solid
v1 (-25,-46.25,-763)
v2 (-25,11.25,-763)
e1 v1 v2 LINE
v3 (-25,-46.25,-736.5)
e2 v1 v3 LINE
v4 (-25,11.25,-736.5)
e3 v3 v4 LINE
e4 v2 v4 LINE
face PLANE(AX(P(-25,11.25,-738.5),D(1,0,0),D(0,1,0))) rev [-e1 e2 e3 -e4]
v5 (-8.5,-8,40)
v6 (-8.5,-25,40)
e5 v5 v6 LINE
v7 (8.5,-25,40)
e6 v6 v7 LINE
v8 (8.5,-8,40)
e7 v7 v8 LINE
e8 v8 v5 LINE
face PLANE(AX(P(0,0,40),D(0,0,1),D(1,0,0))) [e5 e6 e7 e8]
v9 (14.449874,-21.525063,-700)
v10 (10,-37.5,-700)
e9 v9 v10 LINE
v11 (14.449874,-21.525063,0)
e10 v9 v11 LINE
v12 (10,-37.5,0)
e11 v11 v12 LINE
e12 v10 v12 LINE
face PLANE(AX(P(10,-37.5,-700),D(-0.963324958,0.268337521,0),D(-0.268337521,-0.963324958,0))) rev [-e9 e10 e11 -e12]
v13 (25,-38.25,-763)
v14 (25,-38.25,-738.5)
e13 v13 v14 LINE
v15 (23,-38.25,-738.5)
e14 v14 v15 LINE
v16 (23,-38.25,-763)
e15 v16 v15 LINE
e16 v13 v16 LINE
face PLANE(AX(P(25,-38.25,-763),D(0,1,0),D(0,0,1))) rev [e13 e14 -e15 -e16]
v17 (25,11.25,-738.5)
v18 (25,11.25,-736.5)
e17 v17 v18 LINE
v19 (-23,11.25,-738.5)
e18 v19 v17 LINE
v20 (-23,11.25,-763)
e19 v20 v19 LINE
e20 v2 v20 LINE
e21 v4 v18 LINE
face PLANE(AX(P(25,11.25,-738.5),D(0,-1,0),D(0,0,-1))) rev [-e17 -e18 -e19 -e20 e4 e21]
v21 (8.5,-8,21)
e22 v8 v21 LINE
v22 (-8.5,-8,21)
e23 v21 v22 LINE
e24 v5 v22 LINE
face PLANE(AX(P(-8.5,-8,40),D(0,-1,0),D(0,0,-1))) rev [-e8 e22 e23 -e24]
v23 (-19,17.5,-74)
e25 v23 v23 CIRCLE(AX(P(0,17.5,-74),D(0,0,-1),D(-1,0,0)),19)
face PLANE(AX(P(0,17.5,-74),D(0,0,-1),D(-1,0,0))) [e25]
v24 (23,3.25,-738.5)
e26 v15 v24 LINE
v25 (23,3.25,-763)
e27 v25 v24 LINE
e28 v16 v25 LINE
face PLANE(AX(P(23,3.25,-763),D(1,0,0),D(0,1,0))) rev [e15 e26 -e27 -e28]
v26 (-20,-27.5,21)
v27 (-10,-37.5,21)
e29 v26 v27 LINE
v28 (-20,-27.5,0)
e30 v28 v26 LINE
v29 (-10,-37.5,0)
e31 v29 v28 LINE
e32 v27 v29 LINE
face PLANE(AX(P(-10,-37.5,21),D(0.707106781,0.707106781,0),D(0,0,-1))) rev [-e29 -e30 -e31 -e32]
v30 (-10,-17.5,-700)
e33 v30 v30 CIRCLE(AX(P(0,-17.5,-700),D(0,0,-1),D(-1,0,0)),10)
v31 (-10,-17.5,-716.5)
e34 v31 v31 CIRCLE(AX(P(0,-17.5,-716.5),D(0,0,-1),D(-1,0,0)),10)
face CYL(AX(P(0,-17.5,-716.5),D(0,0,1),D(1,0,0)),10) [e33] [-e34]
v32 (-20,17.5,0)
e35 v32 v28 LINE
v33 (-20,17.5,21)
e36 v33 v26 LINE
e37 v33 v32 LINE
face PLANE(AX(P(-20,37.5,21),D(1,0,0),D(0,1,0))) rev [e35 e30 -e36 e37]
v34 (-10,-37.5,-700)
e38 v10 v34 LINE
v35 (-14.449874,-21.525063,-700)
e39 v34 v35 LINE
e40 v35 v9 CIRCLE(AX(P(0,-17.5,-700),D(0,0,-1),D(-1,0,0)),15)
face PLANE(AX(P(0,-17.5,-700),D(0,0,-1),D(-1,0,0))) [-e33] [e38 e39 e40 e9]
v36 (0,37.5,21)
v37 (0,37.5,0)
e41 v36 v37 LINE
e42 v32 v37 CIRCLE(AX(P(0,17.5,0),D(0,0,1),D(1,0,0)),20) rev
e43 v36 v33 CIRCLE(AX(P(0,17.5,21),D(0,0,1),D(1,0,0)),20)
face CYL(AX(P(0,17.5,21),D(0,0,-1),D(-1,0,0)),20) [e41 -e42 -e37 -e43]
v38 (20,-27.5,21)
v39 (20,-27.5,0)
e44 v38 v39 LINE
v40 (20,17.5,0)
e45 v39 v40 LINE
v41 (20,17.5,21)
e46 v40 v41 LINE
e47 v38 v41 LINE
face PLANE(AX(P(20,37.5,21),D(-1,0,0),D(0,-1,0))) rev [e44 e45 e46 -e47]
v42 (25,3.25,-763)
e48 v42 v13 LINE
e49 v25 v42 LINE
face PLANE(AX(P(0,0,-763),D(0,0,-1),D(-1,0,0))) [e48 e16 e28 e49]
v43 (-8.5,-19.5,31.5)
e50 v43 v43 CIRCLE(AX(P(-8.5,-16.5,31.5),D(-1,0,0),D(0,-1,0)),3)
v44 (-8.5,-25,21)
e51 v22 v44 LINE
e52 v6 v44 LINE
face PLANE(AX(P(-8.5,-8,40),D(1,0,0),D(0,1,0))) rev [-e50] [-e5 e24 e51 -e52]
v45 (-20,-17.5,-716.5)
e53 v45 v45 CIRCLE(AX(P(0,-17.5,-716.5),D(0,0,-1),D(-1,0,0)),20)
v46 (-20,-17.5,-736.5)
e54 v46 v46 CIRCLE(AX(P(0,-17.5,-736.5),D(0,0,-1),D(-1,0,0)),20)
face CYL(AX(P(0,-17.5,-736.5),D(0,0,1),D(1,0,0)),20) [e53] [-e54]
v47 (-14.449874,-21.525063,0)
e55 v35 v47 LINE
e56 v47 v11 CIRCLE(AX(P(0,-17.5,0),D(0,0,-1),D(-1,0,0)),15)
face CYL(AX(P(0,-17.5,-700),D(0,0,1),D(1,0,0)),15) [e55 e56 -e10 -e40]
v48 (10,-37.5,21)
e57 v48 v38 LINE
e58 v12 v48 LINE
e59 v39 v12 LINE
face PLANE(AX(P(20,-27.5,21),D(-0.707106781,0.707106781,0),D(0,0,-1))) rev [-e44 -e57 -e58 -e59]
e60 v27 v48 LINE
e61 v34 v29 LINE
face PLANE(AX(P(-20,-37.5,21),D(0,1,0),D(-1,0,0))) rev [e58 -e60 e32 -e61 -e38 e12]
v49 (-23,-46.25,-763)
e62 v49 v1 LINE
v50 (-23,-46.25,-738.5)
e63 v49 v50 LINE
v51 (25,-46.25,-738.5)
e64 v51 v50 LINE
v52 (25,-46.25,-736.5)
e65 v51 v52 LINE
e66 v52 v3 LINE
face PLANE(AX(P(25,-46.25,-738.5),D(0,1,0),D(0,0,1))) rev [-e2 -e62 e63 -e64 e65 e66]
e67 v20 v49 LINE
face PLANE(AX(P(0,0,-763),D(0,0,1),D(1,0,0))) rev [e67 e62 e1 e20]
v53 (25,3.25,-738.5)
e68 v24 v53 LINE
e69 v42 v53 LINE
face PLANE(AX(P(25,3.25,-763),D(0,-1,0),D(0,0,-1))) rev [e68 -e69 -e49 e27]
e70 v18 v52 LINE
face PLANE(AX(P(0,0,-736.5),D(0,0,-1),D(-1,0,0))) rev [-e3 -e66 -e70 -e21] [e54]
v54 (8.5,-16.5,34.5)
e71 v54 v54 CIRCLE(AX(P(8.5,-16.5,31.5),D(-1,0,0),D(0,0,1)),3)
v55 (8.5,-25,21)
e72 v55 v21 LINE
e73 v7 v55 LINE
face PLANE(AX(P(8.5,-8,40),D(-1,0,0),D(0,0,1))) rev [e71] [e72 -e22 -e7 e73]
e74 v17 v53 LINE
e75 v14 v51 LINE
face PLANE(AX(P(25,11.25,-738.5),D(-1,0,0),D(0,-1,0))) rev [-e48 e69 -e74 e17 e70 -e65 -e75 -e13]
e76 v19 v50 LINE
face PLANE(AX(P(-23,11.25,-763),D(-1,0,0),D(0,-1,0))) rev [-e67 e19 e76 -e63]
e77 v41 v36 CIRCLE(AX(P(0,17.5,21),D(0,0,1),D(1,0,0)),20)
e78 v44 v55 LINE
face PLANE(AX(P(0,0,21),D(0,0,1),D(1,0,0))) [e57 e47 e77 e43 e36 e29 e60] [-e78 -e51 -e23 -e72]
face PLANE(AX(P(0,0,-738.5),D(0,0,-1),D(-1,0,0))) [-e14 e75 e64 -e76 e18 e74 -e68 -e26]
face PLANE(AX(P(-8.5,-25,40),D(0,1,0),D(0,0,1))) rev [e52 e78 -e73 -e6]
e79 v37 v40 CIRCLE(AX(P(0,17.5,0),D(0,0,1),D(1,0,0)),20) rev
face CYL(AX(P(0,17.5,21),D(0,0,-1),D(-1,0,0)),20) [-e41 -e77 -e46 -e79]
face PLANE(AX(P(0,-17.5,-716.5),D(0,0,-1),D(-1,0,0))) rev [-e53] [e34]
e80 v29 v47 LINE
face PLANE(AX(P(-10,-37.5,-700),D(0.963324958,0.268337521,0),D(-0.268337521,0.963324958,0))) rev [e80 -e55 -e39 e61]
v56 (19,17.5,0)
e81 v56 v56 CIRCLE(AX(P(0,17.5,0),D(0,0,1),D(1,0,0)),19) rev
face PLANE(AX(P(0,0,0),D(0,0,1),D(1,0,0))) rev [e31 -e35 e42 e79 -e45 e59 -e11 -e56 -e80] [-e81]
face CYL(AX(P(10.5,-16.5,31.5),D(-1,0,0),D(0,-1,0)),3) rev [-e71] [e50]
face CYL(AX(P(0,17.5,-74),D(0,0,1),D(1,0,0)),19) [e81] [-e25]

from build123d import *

# Parameters (mm, degrees)
SKETCH_1_W          = 40
SKETCH_1_H          = 75
EXTRUDE_1_DEPTH     = 21
FILLET_1_R          = 20
CHAMFER_1_SIZE      = 10
EXTRUDE_2_DEPTH     = 700
SKETCH_3_R          = 19
EXTRUDE_4_DEPTH     = 74
SKETCH_4_W          = 17
SKETCH_4_H          = 17
EXTRUDE_5_DEPTH     = 19
SKETCH_5_R          = 3
CUT_EXTRUDE_1_DEPTH = 19
SKETCH_6_R          = 10
EXTRUDE_6_DEPTH     = 16.5
SKETCH_7_R          = 20
EXTRUDE_7_DEPTH     = 20
SKETCH_8_W          = 50
SKETCH_8_H          = 57.5
EXTRUDE_8_DEPTH     = 2
SKETCH_9_W          = 2
SKETCH_9_H          = 57.5
EXTRUDE_9_DEPTH     = 24.5
SKETCH_10_W         = 2
SKETCH_10_H         = 41.5
EXTRUDE_10_DEPTH    = 24.5


with BuildPart() as part:
    # 草图1 → 凸台-拉伸1 (new body)
    with BuildSketch(Plane.XY):
        Rectangle(SKETCH_1_W, SKETCH_1_H)
    extrude(amount=EXTRUDE_1_DEPTH)

    # 圆角1
    fillet_1_edges = [part.edges().sort_by_distance(p)[0] for p in [
        (-20, 37.5, 10.5),
        (20, 37.5, 10.5),
    ]]
    fillet(fillet_1_edges, radius=FILLET_1_R - 0.0001)  # a hair under: the kernel refuses the full size

    # 倒角1
    chamfer_1_edges = [part.edges().sort_by_distance(p)[0] for p in [
        (20, -37.5, 10.5),
        (-20, -37.5, 10.5),
    ]]
    chamfer(chamfer_1_edges, length=CHAMFER_1_SIZE)

    # 草图2 → 凸台-拉伸2 (add)
    with BuildSketch(Plane(origin=(0, 0, 0), x_dir=(-1, 0, 0), z_dir=(0, 0, -1))):
        with BuildLine():
            Line((-10, -37.5), (10, -37.5))
            Line((10, -37.5), (14.449874371, -21.525062814))
            ThreePointArc((14.449874371, -21.525062814), (0, -2.5), (-14.449874371, -21.525062814))
            Line((-14.449874371, -21.525062814), (-10, -37.5))
        make_face()
    extrude(amount=EXTRUDE_2_DEPTH)

    # 草图3 → 凸台-拉伸4 (add)
    with BuildSketch(Plane(origin=(0, 0, 0), x_dir=(-1, 0, 0), z_dir=(0, 0, -1))):
        with Locations(Location((0, 17.5, 0), (0, 0, 180))):
            Circle(SKETCH_3_R)
    extrude(amount=EXTRUDE_4_DEPTH)

    # 草图4 → 凸台-拉伸5 (add)
    with BuildSketch(Plane.XY.offset(21)):
        with Locations((0, -16.5)):
            Rectangle(SKETCH_4_W, SKETCH_4_H)
    extrude(amount=EXTRUDE_5_DEPTH)

    # 草图5 → 切除-拉伸1 (cut)
    with BuildSketch(Plane.ZY.offset(8.5)):
        with Locations(Location((31.5, -16.5, 0), (0, 0, 270))):
            Circle(SKETCH_5_R)
    extrude(amount=-CUT_EXTRUDE_1_DEPTH, mode=Mode.SUBTRACT)

    # 草图6 → 凸台-拉伸6 (add)
    with BuildSketch(Plane(origin=(0, 0, -700), x_dir=(-1, 0, 0), z_dir=(0, 0, -1))):
        with Locations((0, -17.5)):
            Circle(SKETCH_6_R)
    extrude(amount=EXTRUDE_6_DEPTH)

    # 草图7 → 凸台-拉伸7 (add)
    with BuildSketch(Plane(origin=(0, 0, -716.5), x_dir=(-1, 0, 0), z_dir=(0, 0, -1))):
        with Locations((0, -17.5)):
            Circle(SKETCH_7_R)
    extrude(amount=EXTRUDE_7_DEPTH)

    # 草图8 → 凸台-拉伸8 (add)
    with BuildSketch(Plane(origin=(0, 0, -736.5), x_dir=(-1, 0, 0), z_dir=(0, 0, -1))):
        with Locations((0, -17.5)):
            Rectangle(SKETCH_8_W, SKETCH_8_H)
    extrude(amount=EXTRUDE_8_DEPTH)

    # 草图9 → 凸台-拉伸9 (add)
    with BuildSketch(Plane(origin=(0, 0, -738.5), x_dir=(-1, 0, 0), z_dir=(0, 0, -1))):
        with Locations((24, -17.5)):
            Rectangle(SKETCH_9_W, SKETCH_9_H)
    extrude(amount=EXTRUDE_9_DEPTH)

    # 草图10 → 凸台-拉伸10 (add)
    with BuildSketch(Plane(origin=(0, 0, -738.5), x_dir=(-1, 0, 0), z_dir=(0, 0, -1))):
        with Locations((-24, -17.5)):
            Rectangle(SKETCH_10_W, SKETCH_10_H)
    extrude(amount=EXTRUDE_10_DEPTH)


solid = part.part
